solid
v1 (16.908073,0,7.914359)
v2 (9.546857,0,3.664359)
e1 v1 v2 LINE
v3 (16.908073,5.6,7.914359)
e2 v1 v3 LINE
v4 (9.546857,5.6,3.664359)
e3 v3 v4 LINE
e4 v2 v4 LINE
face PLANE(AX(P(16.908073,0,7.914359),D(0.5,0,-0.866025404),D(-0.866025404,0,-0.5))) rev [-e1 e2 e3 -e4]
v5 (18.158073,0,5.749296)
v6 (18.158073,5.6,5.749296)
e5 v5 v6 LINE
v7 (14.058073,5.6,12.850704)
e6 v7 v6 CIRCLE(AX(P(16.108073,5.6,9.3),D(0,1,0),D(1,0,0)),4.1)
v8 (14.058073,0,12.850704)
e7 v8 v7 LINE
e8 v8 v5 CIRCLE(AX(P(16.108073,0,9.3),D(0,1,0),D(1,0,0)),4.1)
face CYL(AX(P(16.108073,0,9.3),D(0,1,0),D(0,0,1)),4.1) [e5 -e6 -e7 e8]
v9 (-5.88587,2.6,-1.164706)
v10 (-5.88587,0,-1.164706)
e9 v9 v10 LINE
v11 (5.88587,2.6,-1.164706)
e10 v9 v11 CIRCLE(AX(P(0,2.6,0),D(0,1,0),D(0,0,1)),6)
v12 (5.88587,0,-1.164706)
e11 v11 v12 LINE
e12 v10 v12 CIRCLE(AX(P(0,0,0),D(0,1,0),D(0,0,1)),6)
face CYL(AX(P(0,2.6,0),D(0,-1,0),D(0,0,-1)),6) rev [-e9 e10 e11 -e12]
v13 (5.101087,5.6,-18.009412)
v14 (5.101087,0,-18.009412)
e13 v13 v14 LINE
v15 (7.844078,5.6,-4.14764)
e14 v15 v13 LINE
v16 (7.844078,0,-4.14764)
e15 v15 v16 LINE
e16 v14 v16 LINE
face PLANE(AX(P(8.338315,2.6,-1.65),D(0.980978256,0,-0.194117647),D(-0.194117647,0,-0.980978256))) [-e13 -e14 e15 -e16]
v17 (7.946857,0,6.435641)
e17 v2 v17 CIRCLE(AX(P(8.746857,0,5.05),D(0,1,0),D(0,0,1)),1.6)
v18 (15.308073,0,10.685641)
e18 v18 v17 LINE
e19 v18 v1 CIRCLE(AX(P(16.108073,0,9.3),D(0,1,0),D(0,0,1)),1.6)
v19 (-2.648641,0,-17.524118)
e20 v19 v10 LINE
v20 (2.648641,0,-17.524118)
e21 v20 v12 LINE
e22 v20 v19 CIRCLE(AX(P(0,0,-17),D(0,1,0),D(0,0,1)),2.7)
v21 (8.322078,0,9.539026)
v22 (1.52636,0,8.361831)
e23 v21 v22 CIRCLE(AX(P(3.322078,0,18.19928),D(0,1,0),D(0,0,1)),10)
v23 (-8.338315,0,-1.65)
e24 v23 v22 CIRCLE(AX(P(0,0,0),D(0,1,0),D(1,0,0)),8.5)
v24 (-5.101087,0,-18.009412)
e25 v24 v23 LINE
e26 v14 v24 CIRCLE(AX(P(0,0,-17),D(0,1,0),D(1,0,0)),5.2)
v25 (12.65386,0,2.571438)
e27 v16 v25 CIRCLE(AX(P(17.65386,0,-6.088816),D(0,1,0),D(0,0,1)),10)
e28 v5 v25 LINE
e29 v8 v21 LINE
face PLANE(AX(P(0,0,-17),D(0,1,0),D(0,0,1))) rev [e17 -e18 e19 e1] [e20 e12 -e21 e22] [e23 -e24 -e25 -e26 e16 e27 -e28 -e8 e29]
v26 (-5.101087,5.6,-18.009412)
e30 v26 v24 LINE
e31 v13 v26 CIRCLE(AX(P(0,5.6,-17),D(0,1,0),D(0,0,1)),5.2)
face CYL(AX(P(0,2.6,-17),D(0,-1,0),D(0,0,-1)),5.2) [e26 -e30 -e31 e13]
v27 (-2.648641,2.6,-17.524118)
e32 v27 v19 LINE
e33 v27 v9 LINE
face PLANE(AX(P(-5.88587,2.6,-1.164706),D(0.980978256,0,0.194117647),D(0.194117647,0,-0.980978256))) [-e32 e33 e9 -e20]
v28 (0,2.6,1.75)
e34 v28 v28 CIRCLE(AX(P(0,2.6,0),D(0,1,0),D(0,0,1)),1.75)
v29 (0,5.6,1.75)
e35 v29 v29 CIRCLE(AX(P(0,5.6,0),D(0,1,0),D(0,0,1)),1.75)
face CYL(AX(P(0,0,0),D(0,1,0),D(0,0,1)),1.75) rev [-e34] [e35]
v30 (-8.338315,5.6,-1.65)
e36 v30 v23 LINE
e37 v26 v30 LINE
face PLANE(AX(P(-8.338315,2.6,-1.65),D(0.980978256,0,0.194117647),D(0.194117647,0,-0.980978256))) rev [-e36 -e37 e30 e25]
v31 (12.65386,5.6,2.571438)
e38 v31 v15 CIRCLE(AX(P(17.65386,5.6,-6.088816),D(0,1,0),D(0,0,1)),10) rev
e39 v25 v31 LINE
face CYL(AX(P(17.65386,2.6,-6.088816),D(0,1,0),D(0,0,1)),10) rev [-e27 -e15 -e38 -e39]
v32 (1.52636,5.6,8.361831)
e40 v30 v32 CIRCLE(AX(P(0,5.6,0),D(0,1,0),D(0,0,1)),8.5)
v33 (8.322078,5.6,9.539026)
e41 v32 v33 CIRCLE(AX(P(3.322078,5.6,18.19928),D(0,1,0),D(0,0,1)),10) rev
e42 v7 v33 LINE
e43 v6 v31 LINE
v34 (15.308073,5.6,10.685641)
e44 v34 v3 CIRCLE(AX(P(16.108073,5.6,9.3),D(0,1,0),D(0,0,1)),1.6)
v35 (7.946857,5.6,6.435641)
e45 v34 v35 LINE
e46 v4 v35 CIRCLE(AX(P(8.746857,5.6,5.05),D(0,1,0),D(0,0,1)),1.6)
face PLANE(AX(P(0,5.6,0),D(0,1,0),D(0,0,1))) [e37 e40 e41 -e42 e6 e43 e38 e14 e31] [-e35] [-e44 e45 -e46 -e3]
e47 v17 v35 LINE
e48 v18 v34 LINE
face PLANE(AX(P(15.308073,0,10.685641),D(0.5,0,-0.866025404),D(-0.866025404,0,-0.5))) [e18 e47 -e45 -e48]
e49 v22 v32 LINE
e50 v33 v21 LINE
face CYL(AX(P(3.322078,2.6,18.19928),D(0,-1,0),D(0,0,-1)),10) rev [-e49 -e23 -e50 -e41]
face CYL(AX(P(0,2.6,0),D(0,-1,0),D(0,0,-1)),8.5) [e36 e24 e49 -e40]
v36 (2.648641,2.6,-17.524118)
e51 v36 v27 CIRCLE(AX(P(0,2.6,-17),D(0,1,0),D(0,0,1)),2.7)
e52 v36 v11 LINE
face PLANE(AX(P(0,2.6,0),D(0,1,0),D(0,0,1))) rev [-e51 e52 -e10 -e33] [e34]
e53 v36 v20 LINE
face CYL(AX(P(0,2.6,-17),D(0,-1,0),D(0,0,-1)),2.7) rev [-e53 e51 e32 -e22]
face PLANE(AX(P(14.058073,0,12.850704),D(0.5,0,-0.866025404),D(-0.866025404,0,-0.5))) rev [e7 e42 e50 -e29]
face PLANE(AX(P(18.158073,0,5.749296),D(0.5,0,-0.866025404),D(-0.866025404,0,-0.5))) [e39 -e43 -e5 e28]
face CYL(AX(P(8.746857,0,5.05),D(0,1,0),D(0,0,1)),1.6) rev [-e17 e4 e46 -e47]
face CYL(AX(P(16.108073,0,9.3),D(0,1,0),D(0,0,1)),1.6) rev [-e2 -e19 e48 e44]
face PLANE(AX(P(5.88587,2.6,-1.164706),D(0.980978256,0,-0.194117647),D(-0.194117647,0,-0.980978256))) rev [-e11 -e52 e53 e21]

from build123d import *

# Parameters (mm, degrees)
EXTRUDE_THIN1_DEPTH = 2.6
BOSS_EXTRUDE1_DEPTH = 3
EXTRUDE_THIN2_DEPTH = 5.6
SKETCH5_R           = 1.75
CUT_EXTRUDE1_DEPTH  = 31.537946797
FILLET1_R           = 10


# Read off the part's stored shape, not the designer's step: Extrude-Thin1
with BuildPart() as part:
    # Extrude-Thin1 outline → Extrude-Thin1 (new body)
    with BuildSketch(Plane(origin=(0, 0, 0), x_dir=(1, 0, 0), z_dir=(0, 1, 0))):
        with BuildLine():
            ThreePointArc((5.101086932, 18.009411765), (0, 22.2), (-5.101086932, 18.009411765))
            Line((-5.101086932, 18.009411765), (-8.338315178, 1.65))
            ThreePointArc((-8.338315178, 1.65), (0, -8.5), (8.338315178, 1.65))
            Line((8.338315178, 1.65), (5.101086932, 18.009411765))
        make_face()
        with BuildLine():
            Line((-5.885869537, 1.164705882), (-2.648641292, 17.524117647))
            ThreePointArc((-2.648641292, 17.524117647), (0, 19.7), (2.648641292, 17.524117647))
            Line((2.648641292, 17.524117647), (5.885869537, 1.164705882))
            ThreePointArc((5.885869537, 1.164705882), (0, -6), (-5.885869537, 1.164705882))
        make_face(mode=Mode.SUBTRACT)
    extrude(amount=EXTRUDE_THIN1_DEPTH)

    # Sketch2 → Boss-Extrude1 (add)
    # profile 1 of 2: a face of its own
    with BuildSketch(Plane(origin=(0, 2.6, 0), x_dir=(1, 0, 0), z_dir=(0, 1, 0))):
        with BuildLine():
            Line((8.338315178, 1.65), (5.101086932, 18.009411765))
            ThreePointArc((5.101086932, 18.009411765), (0, 22.2), (-5.101086932, 18.009411765))
            Line((-5.101086932, 18.009411765), (-8.338315178, 1.65))
            ThreePointArc((-8.338315178, 1.65), (0, -8.5), (8.338315178, 1.65))
        make_face()
        with BuildLine():
            ThreePointArc((5.885869537, 1.164705882), (0, -6), (-5.885869537, 1.164705882))
            Line((-5.885869537, 1.164705882), (-2.648641292, 17.524117647))
            ThreePointArc((-2.648641292, 17.524117647), (0, 19.7), (2.648641292, 17.524117647))
            Line((2.648641292, 17.524117647), (5.885869537, 1.164705882))
        make_face(mode=Mode.SUBTRACT)
    # profile 2 of 2: a face of its own
    with BuildSketch(Plane(origin=(0, 2.6, 0), x_dir=(1, 0, 0), z_dir=(0, 1, 0))):
        with BuildLine():
            Line((-5.885869537, 1.164705882), (-2.648641292, 17.524117647))
            ThreePointArc((-2.648641292, 17.524117647), (0, 19.7), (2.648641292, 17.524117647))
            Line((2.648641292, 17.524117647), (5.885869537, 1.164705882))
            ThreePointArc((5.885869537, 1.164705882), (0, -6), (-5.885869537, 1.164705882))
        make_face()
    extrude(amount=BOSS_EXTRUDE1_DEPTH)

    # Sketch4 → Extrude-Thin2 (add, through all)
    with BuildSketch(Plane(origin=(0, 5.6, 0), x_dir=(1, 0, 0), z_dir=(0, 1, 0))):
        with BuildLine():
            Line((10.796856578, -1.499295844), (18.15807251, -5.749295844))
            ThreePointArc((18.15807251, -5.749295844), (19.658776666, -11.35), (14.05807251, -12.850704156))
            Line((14.05807251, -12.850704156), (6.696856578, -8.600704156))
            ThreePointArc((6.696856578, -8.600704156), (5.196152423, -3), (10.796856578, -1.499295844))
        make_face()
        with BuildLine():
            Line((9.546856578, -3.664359354), (16.90807251, -7.914359354))
            ThreePointArc((16.90807251, -7.914359354), (17.493713156, -10.1), (15.30807251, -10.685640646))
            Line((15.30807251, -10.685640646), (7.946856578, -6.435640646))
            ThreePointArc((7.946856578, -6.435640646), (7.361215932, -4.25), (9.546856578, -3.664359354))
        make_face(mode=Mode.SUBTRACT)
    extrude(amount=-EXTRUDE_THIN2_DEPTH)

    # Sketch5 → Cut-Extrude1 (cut, through all)
    with BuildSketch(Plane(origin=(0, 5.6, 0), x_dir=(1, 0, 0), z_dir=(0, 1, 0))):
        with Locations(Location((0, 0, 0), (0, 0, 270))):
            Circle(SKETCH5_R)
    extrude(amount=-CUT_EXTRUDE1_DEPTH, mode=Mode.SUBTRACT)

    # Fillet1
    # the kernel refuses this fillet: 10 mm, written as the material it adds along each edge
    with BuildSketch(Plane(origin=(5.055074156, 5.6, 6.833463637), x_dir=(0.7701817690160239, 0, 0.6378244607063513), z_dir=(0, -1, 0))) as fillet1_piece_1_section:
        with BuildLine():
            CenterArc((5.914673675, 9.859092079), FILLET1_R, 220.025396245, 40.344818113)
            Line((-1.74292086, 3.427821136), (-2.508680314, 2.784694042))
            ThreePointArc((-2.508680314, 2.784694042), (-1.566456977, 1.360530409), (-0.970808966, -0.239854019))
            Line((-0.970808966, -0.239854019), (0.416050435, -0.909341539))
            ThreePointArc((0.416050435, -0.909341539), (2.224378819, -0.671981767), (4.074579357, -0.985909208))
            Line((4.074579357, -0.985909208), (4.241860659, 0))
        make_face()
    fillet1_piece_1 = extrude(amount=13.604651647, mode=Mode.PRIVATE)
    fillet1_piece_1 = split(fillet1_piece_1, bisect_by=Plane(origin=(5.032331635, 0, 8.326315452), z_dir=(0, 1, 0)), keep=Keep.TOP, mode=Mode.PRIVATE)
    add(fillet1_piece_1)
    with BuildSketch(Plane(origin=(8.445490183, 5.6, 0.961090818), x_dir=(0.9339582285833896, 0, 0.35738218654736686), z_dir=(0, -1, 0))) as fillet1_piece_2_section:
        with BuildLine():
            CenterArc((6.080721922, -9.875226453), FILLET1_R, 99.060486088, 48.806816394)
            Line((-2.38746333, -4.556407174), (-3.234281856, -4.024525246))
            ThreePointArc((-3.234281856, -4.024525246), (-1.88007285, -1.868465389), (-0.968377858, 0.249488126))
            Line((-0.968377858, 0.249488126), (0.425065104, 0.905162779))
            ThreePointArc((0.425065104, 0.905162779), (2.23094582, 0.649847195), (4.348474242, 0.987522645))
            Line((4.348474242, 0.987522645), (4.505951304, 0))
        make_face()
    fillet1_piece_2 = extrude(amount=15.860022231, mode=Mode.PRIVATE)
    fillet1_piece_2 = split(fillet1_piece_2, bisect_by=Plane(origin=(9.506243906, 0, -0.256428974), z_dir=(0, 1, 0)), keep=Keep.TOP, mode=Mode.PRIVATE)
    add(fillet1_piece_2)


solid = part.part
